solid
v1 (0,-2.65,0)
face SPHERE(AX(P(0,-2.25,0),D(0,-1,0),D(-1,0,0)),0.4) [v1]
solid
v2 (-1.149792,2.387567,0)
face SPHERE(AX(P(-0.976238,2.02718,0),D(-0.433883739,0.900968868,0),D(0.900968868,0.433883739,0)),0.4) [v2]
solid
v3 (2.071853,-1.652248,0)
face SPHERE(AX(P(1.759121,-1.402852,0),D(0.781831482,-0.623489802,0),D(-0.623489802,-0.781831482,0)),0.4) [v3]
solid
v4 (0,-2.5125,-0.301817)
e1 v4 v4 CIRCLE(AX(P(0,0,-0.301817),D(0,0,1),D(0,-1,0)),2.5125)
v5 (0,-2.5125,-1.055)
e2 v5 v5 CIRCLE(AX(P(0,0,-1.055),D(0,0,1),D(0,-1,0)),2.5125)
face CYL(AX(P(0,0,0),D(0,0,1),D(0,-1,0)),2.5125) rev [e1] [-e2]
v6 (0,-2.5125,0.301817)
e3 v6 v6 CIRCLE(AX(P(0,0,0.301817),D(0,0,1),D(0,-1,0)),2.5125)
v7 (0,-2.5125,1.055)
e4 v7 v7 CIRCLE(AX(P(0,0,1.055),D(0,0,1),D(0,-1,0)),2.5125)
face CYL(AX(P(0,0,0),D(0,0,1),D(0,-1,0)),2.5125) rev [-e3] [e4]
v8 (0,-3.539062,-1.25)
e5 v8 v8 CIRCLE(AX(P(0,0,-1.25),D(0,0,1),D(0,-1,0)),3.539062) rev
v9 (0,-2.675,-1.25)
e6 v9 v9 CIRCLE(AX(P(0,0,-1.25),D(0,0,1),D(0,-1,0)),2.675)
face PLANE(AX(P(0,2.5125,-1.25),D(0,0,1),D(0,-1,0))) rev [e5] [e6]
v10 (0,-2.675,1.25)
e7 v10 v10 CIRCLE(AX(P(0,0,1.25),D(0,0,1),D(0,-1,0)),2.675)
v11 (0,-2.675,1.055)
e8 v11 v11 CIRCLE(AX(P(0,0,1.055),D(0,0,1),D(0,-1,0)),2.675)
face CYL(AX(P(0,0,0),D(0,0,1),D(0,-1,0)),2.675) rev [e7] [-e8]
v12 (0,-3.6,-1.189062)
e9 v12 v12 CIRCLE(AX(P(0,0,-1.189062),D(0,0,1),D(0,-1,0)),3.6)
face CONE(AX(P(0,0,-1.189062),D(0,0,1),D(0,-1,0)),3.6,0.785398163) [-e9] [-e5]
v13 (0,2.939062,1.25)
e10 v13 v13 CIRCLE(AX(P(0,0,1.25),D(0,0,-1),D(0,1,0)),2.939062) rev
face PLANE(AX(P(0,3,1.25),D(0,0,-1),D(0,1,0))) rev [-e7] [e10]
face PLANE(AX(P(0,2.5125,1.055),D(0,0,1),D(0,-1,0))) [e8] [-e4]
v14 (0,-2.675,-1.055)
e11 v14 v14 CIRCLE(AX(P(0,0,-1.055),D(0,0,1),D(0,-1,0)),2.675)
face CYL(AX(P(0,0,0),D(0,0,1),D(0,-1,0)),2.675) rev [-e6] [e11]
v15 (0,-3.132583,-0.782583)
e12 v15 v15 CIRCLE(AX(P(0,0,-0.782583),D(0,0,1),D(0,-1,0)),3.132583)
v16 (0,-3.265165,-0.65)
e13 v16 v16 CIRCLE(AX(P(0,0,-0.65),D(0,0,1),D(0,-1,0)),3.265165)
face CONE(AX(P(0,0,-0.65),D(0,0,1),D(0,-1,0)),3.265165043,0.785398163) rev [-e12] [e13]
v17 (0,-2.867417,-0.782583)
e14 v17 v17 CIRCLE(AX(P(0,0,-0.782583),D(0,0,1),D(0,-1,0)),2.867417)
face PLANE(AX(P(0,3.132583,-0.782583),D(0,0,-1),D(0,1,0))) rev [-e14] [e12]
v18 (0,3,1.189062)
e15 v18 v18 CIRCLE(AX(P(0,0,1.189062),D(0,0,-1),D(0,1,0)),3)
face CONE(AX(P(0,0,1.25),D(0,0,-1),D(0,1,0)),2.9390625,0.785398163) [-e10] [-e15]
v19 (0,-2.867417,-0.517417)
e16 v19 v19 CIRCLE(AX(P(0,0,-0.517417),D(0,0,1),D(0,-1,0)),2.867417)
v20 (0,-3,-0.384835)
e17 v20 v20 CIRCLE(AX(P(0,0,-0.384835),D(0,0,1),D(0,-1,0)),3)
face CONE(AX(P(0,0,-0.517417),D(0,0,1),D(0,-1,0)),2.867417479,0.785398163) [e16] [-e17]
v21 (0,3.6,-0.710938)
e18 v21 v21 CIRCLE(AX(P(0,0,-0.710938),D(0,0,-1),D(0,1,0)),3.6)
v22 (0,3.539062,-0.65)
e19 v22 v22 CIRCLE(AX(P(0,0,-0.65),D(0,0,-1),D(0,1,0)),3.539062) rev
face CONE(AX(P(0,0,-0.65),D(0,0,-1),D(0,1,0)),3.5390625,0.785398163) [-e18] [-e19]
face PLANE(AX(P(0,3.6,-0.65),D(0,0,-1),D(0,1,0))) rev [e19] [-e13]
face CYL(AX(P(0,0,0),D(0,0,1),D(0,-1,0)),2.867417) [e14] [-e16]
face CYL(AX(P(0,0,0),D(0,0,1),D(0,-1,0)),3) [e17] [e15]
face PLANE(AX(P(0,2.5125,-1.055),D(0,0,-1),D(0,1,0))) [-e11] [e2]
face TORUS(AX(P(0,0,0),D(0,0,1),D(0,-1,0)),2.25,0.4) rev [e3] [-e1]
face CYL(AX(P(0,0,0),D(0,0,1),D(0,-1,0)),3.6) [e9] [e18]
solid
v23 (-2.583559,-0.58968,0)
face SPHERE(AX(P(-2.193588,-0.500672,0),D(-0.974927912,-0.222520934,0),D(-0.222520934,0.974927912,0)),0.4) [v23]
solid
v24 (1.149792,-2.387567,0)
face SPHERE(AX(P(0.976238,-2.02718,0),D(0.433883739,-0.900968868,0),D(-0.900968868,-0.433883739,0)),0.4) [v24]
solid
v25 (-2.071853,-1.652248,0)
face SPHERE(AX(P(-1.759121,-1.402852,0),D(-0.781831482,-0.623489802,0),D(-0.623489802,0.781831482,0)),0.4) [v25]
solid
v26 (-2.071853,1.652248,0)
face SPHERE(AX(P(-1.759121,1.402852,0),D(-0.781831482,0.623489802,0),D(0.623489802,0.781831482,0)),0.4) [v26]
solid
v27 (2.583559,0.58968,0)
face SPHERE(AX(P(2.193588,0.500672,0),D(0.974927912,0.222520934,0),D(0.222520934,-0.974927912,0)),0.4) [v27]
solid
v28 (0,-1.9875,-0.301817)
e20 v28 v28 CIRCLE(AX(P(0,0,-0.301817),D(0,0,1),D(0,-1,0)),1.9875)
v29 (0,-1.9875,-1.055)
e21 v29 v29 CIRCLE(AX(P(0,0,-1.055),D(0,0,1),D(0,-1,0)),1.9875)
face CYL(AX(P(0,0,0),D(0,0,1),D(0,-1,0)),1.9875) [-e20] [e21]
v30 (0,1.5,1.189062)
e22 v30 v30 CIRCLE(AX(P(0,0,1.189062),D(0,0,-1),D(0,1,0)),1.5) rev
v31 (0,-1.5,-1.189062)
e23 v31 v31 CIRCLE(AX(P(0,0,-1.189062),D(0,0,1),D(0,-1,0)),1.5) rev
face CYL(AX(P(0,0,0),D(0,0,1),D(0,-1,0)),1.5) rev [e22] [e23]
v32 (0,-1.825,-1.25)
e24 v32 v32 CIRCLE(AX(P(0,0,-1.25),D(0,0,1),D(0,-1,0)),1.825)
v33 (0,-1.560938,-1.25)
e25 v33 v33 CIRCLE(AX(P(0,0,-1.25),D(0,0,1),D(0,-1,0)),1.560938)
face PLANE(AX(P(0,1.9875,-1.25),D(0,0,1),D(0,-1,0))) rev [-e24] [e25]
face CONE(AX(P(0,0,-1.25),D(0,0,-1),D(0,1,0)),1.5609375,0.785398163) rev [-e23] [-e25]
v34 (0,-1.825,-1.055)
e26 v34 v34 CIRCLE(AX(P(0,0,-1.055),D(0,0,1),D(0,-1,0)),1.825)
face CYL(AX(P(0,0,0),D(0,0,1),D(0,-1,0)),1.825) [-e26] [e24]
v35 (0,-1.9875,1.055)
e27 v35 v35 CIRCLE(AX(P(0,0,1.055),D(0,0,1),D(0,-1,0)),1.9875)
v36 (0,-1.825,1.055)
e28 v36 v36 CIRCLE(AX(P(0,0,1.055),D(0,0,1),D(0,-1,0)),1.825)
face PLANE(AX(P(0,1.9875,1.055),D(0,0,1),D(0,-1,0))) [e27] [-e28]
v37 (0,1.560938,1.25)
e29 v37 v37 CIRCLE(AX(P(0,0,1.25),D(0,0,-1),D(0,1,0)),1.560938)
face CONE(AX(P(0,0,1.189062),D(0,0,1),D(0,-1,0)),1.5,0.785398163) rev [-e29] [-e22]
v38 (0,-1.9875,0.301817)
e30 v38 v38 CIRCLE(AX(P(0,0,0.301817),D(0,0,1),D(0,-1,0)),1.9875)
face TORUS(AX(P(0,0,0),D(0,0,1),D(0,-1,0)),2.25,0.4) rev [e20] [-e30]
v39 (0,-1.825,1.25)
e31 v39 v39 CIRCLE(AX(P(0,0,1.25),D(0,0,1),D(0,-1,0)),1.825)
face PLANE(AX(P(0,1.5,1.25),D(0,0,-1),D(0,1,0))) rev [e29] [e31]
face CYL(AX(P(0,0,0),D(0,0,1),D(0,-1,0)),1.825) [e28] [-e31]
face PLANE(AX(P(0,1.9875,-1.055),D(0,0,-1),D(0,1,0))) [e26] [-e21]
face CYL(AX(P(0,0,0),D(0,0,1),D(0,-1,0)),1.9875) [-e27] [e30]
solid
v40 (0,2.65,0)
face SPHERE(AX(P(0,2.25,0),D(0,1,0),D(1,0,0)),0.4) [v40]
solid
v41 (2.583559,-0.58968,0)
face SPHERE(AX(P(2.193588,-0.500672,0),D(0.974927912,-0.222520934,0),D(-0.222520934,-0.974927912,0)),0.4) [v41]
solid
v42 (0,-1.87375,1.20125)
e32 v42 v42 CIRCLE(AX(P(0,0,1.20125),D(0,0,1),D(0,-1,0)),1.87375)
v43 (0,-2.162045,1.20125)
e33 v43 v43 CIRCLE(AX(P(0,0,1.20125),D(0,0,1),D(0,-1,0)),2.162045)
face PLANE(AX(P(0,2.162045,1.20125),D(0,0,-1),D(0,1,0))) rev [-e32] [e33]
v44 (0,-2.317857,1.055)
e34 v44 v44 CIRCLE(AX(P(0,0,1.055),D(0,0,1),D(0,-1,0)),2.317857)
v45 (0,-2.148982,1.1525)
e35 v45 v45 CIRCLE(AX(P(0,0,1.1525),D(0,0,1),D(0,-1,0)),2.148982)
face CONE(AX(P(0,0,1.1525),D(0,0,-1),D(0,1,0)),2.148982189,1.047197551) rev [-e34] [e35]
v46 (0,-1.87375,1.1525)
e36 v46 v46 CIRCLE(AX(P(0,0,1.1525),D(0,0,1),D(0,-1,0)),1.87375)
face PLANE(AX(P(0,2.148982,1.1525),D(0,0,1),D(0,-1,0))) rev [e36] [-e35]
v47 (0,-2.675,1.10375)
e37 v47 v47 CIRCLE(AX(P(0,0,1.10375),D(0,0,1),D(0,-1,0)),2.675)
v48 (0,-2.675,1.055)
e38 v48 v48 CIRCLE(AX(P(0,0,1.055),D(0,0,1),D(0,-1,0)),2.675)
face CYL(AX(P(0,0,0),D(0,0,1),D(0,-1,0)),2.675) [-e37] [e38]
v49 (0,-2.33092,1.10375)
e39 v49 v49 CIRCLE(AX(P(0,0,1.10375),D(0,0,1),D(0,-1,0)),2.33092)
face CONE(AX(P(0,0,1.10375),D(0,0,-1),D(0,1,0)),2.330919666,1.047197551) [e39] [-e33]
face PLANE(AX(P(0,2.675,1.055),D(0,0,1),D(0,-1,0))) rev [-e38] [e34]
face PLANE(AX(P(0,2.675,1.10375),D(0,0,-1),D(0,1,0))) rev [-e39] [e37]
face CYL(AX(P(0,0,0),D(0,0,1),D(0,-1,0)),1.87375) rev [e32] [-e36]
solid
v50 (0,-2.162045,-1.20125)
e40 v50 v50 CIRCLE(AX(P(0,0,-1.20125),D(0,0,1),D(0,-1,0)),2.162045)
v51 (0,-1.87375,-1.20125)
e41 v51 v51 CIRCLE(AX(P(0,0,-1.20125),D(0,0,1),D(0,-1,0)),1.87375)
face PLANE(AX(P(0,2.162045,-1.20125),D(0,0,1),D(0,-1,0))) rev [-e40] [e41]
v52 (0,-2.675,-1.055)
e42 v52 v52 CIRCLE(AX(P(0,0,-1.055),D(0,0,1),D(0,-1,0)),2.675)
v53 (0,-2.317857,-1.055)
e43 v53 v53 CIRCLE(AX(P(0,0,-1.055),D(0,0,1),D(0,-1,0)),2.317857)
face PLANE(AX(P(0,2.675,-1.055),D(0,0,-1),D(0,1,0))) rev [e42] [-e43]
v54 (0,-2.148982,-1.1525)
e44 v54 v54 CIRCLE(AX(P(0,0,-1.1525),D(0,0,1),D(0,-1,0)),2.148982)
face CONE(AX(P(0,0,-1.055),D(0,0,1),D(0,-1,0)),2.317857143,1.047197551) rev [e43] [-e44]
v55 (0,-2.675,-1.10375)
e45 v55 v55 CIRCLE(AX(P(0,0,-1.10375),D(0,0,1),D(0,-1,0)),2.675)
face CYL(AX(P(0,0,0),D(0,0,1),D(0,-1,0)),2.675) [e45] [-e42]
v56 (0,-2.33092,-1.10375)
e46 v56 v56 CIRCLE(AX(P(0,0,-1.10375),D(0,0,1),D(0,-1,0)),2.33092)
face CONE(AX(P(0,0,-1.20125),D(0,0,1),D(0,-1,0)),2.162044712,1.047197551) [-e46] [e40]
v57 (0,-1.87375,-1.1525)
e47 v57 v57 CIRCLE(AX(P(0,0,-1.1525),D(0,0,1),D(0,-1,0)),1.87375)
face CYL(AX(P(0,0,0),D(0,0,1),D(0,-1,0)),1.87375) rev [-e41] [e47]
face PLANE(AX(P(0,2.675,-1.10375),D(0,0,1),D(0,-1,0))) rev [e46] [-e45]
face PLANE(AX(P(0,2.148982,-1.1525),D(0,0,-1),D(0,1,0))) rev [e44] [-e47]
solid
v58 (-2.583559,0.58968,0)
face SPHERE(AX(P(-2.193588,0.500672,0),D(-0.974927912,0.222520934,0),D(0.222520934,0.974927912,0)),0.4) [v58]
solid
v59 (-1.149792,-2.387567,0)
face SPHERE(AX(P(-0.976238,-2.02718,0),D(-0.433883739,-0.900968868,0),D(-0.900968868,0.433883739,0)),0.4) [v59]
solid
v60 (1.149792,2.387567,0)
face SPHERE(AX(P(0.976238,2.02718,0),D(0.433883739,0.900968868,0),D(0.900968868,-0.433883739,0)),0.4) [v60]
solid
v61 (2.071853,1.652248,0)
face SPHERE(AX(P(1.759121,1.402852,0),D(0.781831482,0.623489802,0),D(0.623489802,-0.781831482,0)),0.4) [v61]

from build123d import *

# Parameters (mm, degrees)
FILLET1_SIZE      = 0.0609375
FILLET2_SIZE      = 0.0609375
CIRPATTERN3_COUNT = 14
SKETCH8_W         = 0.195
SKETCH8_H         = 0.1625


with BuildPart() as part:
    # Sketch2 → Revolve1 (revolve)
    with BuildSketch(Plane(origin=(0, 0, 0), x_dir=(0, 0, -1), z_dir=(1, 0, 0))):
        with BuildLine():
            Line((1.25, 3.6), (0.65, 3.6))
            Line((0.65, 3.6), (0.65, 3.265165043))
            Line((0.65, 3.265165043), (0.782582521, 3.132582521))
            Line((0.782582521, 3.132582521), (0.782582521, 2.867417479))
            Line((0.782582521, 2.867417479), (0.517417479, 2.867417479))
            Line((0.517417479, 2.867417479), (0.384834957, 3))
            Line((0.384834957, 3), (-1.25, 3))
            Line((-1.25, 3), (-1.25, 2.5125))
            Line((-1.25, 2.5125), (-0.301817412, 2.5125))
            ThreePointArc((-0.301817412, 2.5125), (0, 2.65), (0.301817412, 2.5125))
            Line((0.301817412, 2.5125), (1.25, 2.5125))
            Line((1.25, 2.5125), (1.25, 3.6))
        make_face()
        with BuildLine():
            Line((1.25, 1.5), (-1.25, 1.5))
            Line((-1.25, 1.5), (-1.25, 1.9875))
            Line((-1.25, 1.9875), (-0.301817412, 1.9875))
            ThreePointArc((-0.301817412, 1.9875), (0, 1.85), (0.301817412, 1.9875))
            Line((0.301817412, 1.9875), (1.25, 1.9875))
            Line((1.25, 1.9875), (1.25, 1.5))
        make_face()
    revolve(axis=Axis((0, 0, 0), (0, 0, -1)))

    # Fillet1
    fillet1_edges = [part.edges().sort_by_distance(p)[0] for p in [
        (0, -3.6, -1.25),
        (0, -3.6, -0.65),
        (0, -3, 1.25),
    ]]
    chamfer(fillet1_edges, length=FILLET1_SIZE)

    # Fillet2
    fillet2_edges = [part.edges().sort_by_distance(p)[0] for p in [
        (0, -1.5, -1.25),
        (0, -1.5, 1.25),
    ]]
    chamfer(fillet2_edges, length=FILLET2_SIZE)

    # Sketch8 → Cut-Revolve1 (revolve, cut)
    with BuildSketch(Plane(origin=(0, 0, 0), x_dir=(0, 0, -1), z_dir=(1, 0, 0))):
        with Locations((-1.1525, 2.59375)):
            Rectangle(SKETCH8_W, SKETCH8_H)
        with Locations((1.1525, 2.59375)):
            Rectangle(SKETCH8_W, SKETCH8_H)
        with Locations((1.1525, 1.90625)):
            Rectangle(SKETCH8_W, SKETCH8_H)
        with Locations((-1.1525, 1.90625)):
            Rectangle(SKETCH8_W, SKETCH8_H)
    revolve(axis=Axis((0, 0, 0), (0, 0, -1)), mode=Mode.SUBTRACT)


with BuildPart() as body_2:
    # Sketch7 → Revolve3 (revolve)
    with BuildSketch(Plane.XY):
        with BuildLine():
            Line((0, 2.65), (0, 1.85))
            ThreePointArc((0, 1.85), (-0.4, 2.25), (0, 2.65))
        make_face()
    revolve(axis=Axis((0, 2.65, 0), (0, -1, 0)))


with BuildPart() as cirpattern3_1:
    # CirPattern3: pattern copy
    add(body_2.part.rotate(Axis((0, 0, 0), (0, 0, -1)), 1 * 360 / CIRPATTERN3_COUNT))


with BuildPart() as cirpattern3_2:
    # CirPattern3: pattern copy
    add(body_2.part.rotate(Axis((0, 0, 0), (0, 0, -1)), 2 * 360 / CIRPATTERN3_COUNT))


with BuildPart() as cirpattern3_3:
    # CirPattern3: pattern copy
    add(body_2.part.rotate(Axis((0, 0, 0), (0, 0, -1)), 3 * 360 / CIRPATTERN3_COUNT))


with BuildPart() as cirpattern3_4:
    # CirPattern3: pattern copy
    add(body_2.part.rotate(Axis((0, 0, 0), (0, 0, -1)), 4 * 360 / CIRPATTERN3_COUNT))


with BuildPart() as cirpattern3_5:
    # CirPattern3: pattern copy
    add(body_2.part.rotate(Axis((0, 0, 0), (0, 0, -1)), 5 * 360 / CIRPATTERN3_COUNT))


with BuildPart() as cirpattern3_6:
    # CirPattern3: pattern copy
    add(body_2.part.rotate(Axis((0, 0, 0), (0, 0, -1)), 6 * 360 / CIRPATTERN3_COUNT))


with BuildPart() as cirpattern3_7:
    # CirPattern3: pattern copy
    add(body_2.part.rotate(Axis((0, 0, 0), (0, 0, -1)), 7 * 360 / CIRPATTERN3_COUNT))


with BuildPart() as cirpattern3_8:
    # CirPattern3: pattern copy
    add(body_2.part.rotate(Axis((0, 0, 0), (0, 0, -1)), 8 * 360 / CIRPATTERN3_COUNT))


with BuildPart() as cirpattern3_9:
    # CirPattern3: pattern copy
    add(body_2.part.rotate(Axis((0, 0, 0), (0, 0, -1)), 9 * 360 / CIRPATTERN3_COUNT))


with BuildPart() as cirpattern3_10:
    # CirPattern3: pattern copy
    add(body_2.part.rotate(Axis((0, 0, 0), (0, 0, -1)), 10 * 360 / CIRPATTERN3_COUNT))


with BuildPart() as cirpattern3_11:
    # CirPattern3: pattern copy
    add(body_2.part.rotate(Axis((0, 0, 0), (0, 0, -1)), 11 * 360 / CIRPATTERN3_COUNT))


with BuildPart() as cirpattern3_12:
    # CirPattern3: pattern copy
    add(body_2.part.rotate(Axis((0, 0, 0), (0, 0, -1)), 12 * 360 / CIRPATTERN3_COUNT))


with BuildPart() as cirpattern3_13:
    # CirPattern3: pattern copy
    add(body_2.part.rotate(Axis((0, 0, 0), (0, 0, -1)), 13 * 360 / CIRPATTERN3_COUNT))


with BuildPart() as body_16:
    # Sketch9 → Revolve4 (revolve)
    with BuildSketch(Plane(origin=(0, 0, 0), x_dir=(0, 0, -1), z_dir=(1, 0, 0))):
        Polygon((-1.055, 2.675), (-1.055, 2.317857143), (-1.1525, 2.148982189), (-1.1525, 1.87375), (-1.20125, 1.87375), (-1.20125, 2.162044712), (-1.10375, 2.330919666), (-1.10375, 2.675), align=None)
        Polygon((1.055, 2.675), (1.055, 2.317857143), (1.1525, 2.148982189), (1.1525, 1.87375), (1.20125, 1.87375), (1.20125, 2.162044712), (1.10375, 2.330919666), (1.10375, 2.675), align=None)
    revolve(axis=Axis((0, 0, 0), (0, 0, -1)))


solid = Compound([part.part, body_2.part, cirpattern3_1.part, cirpattern3_2.part, cirpattern3_3.part, cirpattern3_4.part, cirpattern3_5.part, cirpattern3_6.part, cirpattern3_7.part, cirpattern3_8.part, cirpattern3_9.part, cirpattern3_10.part, cirpattern3_11.part, cirpattern3_12.part, cirpattern3_13.part, body_16.part])
